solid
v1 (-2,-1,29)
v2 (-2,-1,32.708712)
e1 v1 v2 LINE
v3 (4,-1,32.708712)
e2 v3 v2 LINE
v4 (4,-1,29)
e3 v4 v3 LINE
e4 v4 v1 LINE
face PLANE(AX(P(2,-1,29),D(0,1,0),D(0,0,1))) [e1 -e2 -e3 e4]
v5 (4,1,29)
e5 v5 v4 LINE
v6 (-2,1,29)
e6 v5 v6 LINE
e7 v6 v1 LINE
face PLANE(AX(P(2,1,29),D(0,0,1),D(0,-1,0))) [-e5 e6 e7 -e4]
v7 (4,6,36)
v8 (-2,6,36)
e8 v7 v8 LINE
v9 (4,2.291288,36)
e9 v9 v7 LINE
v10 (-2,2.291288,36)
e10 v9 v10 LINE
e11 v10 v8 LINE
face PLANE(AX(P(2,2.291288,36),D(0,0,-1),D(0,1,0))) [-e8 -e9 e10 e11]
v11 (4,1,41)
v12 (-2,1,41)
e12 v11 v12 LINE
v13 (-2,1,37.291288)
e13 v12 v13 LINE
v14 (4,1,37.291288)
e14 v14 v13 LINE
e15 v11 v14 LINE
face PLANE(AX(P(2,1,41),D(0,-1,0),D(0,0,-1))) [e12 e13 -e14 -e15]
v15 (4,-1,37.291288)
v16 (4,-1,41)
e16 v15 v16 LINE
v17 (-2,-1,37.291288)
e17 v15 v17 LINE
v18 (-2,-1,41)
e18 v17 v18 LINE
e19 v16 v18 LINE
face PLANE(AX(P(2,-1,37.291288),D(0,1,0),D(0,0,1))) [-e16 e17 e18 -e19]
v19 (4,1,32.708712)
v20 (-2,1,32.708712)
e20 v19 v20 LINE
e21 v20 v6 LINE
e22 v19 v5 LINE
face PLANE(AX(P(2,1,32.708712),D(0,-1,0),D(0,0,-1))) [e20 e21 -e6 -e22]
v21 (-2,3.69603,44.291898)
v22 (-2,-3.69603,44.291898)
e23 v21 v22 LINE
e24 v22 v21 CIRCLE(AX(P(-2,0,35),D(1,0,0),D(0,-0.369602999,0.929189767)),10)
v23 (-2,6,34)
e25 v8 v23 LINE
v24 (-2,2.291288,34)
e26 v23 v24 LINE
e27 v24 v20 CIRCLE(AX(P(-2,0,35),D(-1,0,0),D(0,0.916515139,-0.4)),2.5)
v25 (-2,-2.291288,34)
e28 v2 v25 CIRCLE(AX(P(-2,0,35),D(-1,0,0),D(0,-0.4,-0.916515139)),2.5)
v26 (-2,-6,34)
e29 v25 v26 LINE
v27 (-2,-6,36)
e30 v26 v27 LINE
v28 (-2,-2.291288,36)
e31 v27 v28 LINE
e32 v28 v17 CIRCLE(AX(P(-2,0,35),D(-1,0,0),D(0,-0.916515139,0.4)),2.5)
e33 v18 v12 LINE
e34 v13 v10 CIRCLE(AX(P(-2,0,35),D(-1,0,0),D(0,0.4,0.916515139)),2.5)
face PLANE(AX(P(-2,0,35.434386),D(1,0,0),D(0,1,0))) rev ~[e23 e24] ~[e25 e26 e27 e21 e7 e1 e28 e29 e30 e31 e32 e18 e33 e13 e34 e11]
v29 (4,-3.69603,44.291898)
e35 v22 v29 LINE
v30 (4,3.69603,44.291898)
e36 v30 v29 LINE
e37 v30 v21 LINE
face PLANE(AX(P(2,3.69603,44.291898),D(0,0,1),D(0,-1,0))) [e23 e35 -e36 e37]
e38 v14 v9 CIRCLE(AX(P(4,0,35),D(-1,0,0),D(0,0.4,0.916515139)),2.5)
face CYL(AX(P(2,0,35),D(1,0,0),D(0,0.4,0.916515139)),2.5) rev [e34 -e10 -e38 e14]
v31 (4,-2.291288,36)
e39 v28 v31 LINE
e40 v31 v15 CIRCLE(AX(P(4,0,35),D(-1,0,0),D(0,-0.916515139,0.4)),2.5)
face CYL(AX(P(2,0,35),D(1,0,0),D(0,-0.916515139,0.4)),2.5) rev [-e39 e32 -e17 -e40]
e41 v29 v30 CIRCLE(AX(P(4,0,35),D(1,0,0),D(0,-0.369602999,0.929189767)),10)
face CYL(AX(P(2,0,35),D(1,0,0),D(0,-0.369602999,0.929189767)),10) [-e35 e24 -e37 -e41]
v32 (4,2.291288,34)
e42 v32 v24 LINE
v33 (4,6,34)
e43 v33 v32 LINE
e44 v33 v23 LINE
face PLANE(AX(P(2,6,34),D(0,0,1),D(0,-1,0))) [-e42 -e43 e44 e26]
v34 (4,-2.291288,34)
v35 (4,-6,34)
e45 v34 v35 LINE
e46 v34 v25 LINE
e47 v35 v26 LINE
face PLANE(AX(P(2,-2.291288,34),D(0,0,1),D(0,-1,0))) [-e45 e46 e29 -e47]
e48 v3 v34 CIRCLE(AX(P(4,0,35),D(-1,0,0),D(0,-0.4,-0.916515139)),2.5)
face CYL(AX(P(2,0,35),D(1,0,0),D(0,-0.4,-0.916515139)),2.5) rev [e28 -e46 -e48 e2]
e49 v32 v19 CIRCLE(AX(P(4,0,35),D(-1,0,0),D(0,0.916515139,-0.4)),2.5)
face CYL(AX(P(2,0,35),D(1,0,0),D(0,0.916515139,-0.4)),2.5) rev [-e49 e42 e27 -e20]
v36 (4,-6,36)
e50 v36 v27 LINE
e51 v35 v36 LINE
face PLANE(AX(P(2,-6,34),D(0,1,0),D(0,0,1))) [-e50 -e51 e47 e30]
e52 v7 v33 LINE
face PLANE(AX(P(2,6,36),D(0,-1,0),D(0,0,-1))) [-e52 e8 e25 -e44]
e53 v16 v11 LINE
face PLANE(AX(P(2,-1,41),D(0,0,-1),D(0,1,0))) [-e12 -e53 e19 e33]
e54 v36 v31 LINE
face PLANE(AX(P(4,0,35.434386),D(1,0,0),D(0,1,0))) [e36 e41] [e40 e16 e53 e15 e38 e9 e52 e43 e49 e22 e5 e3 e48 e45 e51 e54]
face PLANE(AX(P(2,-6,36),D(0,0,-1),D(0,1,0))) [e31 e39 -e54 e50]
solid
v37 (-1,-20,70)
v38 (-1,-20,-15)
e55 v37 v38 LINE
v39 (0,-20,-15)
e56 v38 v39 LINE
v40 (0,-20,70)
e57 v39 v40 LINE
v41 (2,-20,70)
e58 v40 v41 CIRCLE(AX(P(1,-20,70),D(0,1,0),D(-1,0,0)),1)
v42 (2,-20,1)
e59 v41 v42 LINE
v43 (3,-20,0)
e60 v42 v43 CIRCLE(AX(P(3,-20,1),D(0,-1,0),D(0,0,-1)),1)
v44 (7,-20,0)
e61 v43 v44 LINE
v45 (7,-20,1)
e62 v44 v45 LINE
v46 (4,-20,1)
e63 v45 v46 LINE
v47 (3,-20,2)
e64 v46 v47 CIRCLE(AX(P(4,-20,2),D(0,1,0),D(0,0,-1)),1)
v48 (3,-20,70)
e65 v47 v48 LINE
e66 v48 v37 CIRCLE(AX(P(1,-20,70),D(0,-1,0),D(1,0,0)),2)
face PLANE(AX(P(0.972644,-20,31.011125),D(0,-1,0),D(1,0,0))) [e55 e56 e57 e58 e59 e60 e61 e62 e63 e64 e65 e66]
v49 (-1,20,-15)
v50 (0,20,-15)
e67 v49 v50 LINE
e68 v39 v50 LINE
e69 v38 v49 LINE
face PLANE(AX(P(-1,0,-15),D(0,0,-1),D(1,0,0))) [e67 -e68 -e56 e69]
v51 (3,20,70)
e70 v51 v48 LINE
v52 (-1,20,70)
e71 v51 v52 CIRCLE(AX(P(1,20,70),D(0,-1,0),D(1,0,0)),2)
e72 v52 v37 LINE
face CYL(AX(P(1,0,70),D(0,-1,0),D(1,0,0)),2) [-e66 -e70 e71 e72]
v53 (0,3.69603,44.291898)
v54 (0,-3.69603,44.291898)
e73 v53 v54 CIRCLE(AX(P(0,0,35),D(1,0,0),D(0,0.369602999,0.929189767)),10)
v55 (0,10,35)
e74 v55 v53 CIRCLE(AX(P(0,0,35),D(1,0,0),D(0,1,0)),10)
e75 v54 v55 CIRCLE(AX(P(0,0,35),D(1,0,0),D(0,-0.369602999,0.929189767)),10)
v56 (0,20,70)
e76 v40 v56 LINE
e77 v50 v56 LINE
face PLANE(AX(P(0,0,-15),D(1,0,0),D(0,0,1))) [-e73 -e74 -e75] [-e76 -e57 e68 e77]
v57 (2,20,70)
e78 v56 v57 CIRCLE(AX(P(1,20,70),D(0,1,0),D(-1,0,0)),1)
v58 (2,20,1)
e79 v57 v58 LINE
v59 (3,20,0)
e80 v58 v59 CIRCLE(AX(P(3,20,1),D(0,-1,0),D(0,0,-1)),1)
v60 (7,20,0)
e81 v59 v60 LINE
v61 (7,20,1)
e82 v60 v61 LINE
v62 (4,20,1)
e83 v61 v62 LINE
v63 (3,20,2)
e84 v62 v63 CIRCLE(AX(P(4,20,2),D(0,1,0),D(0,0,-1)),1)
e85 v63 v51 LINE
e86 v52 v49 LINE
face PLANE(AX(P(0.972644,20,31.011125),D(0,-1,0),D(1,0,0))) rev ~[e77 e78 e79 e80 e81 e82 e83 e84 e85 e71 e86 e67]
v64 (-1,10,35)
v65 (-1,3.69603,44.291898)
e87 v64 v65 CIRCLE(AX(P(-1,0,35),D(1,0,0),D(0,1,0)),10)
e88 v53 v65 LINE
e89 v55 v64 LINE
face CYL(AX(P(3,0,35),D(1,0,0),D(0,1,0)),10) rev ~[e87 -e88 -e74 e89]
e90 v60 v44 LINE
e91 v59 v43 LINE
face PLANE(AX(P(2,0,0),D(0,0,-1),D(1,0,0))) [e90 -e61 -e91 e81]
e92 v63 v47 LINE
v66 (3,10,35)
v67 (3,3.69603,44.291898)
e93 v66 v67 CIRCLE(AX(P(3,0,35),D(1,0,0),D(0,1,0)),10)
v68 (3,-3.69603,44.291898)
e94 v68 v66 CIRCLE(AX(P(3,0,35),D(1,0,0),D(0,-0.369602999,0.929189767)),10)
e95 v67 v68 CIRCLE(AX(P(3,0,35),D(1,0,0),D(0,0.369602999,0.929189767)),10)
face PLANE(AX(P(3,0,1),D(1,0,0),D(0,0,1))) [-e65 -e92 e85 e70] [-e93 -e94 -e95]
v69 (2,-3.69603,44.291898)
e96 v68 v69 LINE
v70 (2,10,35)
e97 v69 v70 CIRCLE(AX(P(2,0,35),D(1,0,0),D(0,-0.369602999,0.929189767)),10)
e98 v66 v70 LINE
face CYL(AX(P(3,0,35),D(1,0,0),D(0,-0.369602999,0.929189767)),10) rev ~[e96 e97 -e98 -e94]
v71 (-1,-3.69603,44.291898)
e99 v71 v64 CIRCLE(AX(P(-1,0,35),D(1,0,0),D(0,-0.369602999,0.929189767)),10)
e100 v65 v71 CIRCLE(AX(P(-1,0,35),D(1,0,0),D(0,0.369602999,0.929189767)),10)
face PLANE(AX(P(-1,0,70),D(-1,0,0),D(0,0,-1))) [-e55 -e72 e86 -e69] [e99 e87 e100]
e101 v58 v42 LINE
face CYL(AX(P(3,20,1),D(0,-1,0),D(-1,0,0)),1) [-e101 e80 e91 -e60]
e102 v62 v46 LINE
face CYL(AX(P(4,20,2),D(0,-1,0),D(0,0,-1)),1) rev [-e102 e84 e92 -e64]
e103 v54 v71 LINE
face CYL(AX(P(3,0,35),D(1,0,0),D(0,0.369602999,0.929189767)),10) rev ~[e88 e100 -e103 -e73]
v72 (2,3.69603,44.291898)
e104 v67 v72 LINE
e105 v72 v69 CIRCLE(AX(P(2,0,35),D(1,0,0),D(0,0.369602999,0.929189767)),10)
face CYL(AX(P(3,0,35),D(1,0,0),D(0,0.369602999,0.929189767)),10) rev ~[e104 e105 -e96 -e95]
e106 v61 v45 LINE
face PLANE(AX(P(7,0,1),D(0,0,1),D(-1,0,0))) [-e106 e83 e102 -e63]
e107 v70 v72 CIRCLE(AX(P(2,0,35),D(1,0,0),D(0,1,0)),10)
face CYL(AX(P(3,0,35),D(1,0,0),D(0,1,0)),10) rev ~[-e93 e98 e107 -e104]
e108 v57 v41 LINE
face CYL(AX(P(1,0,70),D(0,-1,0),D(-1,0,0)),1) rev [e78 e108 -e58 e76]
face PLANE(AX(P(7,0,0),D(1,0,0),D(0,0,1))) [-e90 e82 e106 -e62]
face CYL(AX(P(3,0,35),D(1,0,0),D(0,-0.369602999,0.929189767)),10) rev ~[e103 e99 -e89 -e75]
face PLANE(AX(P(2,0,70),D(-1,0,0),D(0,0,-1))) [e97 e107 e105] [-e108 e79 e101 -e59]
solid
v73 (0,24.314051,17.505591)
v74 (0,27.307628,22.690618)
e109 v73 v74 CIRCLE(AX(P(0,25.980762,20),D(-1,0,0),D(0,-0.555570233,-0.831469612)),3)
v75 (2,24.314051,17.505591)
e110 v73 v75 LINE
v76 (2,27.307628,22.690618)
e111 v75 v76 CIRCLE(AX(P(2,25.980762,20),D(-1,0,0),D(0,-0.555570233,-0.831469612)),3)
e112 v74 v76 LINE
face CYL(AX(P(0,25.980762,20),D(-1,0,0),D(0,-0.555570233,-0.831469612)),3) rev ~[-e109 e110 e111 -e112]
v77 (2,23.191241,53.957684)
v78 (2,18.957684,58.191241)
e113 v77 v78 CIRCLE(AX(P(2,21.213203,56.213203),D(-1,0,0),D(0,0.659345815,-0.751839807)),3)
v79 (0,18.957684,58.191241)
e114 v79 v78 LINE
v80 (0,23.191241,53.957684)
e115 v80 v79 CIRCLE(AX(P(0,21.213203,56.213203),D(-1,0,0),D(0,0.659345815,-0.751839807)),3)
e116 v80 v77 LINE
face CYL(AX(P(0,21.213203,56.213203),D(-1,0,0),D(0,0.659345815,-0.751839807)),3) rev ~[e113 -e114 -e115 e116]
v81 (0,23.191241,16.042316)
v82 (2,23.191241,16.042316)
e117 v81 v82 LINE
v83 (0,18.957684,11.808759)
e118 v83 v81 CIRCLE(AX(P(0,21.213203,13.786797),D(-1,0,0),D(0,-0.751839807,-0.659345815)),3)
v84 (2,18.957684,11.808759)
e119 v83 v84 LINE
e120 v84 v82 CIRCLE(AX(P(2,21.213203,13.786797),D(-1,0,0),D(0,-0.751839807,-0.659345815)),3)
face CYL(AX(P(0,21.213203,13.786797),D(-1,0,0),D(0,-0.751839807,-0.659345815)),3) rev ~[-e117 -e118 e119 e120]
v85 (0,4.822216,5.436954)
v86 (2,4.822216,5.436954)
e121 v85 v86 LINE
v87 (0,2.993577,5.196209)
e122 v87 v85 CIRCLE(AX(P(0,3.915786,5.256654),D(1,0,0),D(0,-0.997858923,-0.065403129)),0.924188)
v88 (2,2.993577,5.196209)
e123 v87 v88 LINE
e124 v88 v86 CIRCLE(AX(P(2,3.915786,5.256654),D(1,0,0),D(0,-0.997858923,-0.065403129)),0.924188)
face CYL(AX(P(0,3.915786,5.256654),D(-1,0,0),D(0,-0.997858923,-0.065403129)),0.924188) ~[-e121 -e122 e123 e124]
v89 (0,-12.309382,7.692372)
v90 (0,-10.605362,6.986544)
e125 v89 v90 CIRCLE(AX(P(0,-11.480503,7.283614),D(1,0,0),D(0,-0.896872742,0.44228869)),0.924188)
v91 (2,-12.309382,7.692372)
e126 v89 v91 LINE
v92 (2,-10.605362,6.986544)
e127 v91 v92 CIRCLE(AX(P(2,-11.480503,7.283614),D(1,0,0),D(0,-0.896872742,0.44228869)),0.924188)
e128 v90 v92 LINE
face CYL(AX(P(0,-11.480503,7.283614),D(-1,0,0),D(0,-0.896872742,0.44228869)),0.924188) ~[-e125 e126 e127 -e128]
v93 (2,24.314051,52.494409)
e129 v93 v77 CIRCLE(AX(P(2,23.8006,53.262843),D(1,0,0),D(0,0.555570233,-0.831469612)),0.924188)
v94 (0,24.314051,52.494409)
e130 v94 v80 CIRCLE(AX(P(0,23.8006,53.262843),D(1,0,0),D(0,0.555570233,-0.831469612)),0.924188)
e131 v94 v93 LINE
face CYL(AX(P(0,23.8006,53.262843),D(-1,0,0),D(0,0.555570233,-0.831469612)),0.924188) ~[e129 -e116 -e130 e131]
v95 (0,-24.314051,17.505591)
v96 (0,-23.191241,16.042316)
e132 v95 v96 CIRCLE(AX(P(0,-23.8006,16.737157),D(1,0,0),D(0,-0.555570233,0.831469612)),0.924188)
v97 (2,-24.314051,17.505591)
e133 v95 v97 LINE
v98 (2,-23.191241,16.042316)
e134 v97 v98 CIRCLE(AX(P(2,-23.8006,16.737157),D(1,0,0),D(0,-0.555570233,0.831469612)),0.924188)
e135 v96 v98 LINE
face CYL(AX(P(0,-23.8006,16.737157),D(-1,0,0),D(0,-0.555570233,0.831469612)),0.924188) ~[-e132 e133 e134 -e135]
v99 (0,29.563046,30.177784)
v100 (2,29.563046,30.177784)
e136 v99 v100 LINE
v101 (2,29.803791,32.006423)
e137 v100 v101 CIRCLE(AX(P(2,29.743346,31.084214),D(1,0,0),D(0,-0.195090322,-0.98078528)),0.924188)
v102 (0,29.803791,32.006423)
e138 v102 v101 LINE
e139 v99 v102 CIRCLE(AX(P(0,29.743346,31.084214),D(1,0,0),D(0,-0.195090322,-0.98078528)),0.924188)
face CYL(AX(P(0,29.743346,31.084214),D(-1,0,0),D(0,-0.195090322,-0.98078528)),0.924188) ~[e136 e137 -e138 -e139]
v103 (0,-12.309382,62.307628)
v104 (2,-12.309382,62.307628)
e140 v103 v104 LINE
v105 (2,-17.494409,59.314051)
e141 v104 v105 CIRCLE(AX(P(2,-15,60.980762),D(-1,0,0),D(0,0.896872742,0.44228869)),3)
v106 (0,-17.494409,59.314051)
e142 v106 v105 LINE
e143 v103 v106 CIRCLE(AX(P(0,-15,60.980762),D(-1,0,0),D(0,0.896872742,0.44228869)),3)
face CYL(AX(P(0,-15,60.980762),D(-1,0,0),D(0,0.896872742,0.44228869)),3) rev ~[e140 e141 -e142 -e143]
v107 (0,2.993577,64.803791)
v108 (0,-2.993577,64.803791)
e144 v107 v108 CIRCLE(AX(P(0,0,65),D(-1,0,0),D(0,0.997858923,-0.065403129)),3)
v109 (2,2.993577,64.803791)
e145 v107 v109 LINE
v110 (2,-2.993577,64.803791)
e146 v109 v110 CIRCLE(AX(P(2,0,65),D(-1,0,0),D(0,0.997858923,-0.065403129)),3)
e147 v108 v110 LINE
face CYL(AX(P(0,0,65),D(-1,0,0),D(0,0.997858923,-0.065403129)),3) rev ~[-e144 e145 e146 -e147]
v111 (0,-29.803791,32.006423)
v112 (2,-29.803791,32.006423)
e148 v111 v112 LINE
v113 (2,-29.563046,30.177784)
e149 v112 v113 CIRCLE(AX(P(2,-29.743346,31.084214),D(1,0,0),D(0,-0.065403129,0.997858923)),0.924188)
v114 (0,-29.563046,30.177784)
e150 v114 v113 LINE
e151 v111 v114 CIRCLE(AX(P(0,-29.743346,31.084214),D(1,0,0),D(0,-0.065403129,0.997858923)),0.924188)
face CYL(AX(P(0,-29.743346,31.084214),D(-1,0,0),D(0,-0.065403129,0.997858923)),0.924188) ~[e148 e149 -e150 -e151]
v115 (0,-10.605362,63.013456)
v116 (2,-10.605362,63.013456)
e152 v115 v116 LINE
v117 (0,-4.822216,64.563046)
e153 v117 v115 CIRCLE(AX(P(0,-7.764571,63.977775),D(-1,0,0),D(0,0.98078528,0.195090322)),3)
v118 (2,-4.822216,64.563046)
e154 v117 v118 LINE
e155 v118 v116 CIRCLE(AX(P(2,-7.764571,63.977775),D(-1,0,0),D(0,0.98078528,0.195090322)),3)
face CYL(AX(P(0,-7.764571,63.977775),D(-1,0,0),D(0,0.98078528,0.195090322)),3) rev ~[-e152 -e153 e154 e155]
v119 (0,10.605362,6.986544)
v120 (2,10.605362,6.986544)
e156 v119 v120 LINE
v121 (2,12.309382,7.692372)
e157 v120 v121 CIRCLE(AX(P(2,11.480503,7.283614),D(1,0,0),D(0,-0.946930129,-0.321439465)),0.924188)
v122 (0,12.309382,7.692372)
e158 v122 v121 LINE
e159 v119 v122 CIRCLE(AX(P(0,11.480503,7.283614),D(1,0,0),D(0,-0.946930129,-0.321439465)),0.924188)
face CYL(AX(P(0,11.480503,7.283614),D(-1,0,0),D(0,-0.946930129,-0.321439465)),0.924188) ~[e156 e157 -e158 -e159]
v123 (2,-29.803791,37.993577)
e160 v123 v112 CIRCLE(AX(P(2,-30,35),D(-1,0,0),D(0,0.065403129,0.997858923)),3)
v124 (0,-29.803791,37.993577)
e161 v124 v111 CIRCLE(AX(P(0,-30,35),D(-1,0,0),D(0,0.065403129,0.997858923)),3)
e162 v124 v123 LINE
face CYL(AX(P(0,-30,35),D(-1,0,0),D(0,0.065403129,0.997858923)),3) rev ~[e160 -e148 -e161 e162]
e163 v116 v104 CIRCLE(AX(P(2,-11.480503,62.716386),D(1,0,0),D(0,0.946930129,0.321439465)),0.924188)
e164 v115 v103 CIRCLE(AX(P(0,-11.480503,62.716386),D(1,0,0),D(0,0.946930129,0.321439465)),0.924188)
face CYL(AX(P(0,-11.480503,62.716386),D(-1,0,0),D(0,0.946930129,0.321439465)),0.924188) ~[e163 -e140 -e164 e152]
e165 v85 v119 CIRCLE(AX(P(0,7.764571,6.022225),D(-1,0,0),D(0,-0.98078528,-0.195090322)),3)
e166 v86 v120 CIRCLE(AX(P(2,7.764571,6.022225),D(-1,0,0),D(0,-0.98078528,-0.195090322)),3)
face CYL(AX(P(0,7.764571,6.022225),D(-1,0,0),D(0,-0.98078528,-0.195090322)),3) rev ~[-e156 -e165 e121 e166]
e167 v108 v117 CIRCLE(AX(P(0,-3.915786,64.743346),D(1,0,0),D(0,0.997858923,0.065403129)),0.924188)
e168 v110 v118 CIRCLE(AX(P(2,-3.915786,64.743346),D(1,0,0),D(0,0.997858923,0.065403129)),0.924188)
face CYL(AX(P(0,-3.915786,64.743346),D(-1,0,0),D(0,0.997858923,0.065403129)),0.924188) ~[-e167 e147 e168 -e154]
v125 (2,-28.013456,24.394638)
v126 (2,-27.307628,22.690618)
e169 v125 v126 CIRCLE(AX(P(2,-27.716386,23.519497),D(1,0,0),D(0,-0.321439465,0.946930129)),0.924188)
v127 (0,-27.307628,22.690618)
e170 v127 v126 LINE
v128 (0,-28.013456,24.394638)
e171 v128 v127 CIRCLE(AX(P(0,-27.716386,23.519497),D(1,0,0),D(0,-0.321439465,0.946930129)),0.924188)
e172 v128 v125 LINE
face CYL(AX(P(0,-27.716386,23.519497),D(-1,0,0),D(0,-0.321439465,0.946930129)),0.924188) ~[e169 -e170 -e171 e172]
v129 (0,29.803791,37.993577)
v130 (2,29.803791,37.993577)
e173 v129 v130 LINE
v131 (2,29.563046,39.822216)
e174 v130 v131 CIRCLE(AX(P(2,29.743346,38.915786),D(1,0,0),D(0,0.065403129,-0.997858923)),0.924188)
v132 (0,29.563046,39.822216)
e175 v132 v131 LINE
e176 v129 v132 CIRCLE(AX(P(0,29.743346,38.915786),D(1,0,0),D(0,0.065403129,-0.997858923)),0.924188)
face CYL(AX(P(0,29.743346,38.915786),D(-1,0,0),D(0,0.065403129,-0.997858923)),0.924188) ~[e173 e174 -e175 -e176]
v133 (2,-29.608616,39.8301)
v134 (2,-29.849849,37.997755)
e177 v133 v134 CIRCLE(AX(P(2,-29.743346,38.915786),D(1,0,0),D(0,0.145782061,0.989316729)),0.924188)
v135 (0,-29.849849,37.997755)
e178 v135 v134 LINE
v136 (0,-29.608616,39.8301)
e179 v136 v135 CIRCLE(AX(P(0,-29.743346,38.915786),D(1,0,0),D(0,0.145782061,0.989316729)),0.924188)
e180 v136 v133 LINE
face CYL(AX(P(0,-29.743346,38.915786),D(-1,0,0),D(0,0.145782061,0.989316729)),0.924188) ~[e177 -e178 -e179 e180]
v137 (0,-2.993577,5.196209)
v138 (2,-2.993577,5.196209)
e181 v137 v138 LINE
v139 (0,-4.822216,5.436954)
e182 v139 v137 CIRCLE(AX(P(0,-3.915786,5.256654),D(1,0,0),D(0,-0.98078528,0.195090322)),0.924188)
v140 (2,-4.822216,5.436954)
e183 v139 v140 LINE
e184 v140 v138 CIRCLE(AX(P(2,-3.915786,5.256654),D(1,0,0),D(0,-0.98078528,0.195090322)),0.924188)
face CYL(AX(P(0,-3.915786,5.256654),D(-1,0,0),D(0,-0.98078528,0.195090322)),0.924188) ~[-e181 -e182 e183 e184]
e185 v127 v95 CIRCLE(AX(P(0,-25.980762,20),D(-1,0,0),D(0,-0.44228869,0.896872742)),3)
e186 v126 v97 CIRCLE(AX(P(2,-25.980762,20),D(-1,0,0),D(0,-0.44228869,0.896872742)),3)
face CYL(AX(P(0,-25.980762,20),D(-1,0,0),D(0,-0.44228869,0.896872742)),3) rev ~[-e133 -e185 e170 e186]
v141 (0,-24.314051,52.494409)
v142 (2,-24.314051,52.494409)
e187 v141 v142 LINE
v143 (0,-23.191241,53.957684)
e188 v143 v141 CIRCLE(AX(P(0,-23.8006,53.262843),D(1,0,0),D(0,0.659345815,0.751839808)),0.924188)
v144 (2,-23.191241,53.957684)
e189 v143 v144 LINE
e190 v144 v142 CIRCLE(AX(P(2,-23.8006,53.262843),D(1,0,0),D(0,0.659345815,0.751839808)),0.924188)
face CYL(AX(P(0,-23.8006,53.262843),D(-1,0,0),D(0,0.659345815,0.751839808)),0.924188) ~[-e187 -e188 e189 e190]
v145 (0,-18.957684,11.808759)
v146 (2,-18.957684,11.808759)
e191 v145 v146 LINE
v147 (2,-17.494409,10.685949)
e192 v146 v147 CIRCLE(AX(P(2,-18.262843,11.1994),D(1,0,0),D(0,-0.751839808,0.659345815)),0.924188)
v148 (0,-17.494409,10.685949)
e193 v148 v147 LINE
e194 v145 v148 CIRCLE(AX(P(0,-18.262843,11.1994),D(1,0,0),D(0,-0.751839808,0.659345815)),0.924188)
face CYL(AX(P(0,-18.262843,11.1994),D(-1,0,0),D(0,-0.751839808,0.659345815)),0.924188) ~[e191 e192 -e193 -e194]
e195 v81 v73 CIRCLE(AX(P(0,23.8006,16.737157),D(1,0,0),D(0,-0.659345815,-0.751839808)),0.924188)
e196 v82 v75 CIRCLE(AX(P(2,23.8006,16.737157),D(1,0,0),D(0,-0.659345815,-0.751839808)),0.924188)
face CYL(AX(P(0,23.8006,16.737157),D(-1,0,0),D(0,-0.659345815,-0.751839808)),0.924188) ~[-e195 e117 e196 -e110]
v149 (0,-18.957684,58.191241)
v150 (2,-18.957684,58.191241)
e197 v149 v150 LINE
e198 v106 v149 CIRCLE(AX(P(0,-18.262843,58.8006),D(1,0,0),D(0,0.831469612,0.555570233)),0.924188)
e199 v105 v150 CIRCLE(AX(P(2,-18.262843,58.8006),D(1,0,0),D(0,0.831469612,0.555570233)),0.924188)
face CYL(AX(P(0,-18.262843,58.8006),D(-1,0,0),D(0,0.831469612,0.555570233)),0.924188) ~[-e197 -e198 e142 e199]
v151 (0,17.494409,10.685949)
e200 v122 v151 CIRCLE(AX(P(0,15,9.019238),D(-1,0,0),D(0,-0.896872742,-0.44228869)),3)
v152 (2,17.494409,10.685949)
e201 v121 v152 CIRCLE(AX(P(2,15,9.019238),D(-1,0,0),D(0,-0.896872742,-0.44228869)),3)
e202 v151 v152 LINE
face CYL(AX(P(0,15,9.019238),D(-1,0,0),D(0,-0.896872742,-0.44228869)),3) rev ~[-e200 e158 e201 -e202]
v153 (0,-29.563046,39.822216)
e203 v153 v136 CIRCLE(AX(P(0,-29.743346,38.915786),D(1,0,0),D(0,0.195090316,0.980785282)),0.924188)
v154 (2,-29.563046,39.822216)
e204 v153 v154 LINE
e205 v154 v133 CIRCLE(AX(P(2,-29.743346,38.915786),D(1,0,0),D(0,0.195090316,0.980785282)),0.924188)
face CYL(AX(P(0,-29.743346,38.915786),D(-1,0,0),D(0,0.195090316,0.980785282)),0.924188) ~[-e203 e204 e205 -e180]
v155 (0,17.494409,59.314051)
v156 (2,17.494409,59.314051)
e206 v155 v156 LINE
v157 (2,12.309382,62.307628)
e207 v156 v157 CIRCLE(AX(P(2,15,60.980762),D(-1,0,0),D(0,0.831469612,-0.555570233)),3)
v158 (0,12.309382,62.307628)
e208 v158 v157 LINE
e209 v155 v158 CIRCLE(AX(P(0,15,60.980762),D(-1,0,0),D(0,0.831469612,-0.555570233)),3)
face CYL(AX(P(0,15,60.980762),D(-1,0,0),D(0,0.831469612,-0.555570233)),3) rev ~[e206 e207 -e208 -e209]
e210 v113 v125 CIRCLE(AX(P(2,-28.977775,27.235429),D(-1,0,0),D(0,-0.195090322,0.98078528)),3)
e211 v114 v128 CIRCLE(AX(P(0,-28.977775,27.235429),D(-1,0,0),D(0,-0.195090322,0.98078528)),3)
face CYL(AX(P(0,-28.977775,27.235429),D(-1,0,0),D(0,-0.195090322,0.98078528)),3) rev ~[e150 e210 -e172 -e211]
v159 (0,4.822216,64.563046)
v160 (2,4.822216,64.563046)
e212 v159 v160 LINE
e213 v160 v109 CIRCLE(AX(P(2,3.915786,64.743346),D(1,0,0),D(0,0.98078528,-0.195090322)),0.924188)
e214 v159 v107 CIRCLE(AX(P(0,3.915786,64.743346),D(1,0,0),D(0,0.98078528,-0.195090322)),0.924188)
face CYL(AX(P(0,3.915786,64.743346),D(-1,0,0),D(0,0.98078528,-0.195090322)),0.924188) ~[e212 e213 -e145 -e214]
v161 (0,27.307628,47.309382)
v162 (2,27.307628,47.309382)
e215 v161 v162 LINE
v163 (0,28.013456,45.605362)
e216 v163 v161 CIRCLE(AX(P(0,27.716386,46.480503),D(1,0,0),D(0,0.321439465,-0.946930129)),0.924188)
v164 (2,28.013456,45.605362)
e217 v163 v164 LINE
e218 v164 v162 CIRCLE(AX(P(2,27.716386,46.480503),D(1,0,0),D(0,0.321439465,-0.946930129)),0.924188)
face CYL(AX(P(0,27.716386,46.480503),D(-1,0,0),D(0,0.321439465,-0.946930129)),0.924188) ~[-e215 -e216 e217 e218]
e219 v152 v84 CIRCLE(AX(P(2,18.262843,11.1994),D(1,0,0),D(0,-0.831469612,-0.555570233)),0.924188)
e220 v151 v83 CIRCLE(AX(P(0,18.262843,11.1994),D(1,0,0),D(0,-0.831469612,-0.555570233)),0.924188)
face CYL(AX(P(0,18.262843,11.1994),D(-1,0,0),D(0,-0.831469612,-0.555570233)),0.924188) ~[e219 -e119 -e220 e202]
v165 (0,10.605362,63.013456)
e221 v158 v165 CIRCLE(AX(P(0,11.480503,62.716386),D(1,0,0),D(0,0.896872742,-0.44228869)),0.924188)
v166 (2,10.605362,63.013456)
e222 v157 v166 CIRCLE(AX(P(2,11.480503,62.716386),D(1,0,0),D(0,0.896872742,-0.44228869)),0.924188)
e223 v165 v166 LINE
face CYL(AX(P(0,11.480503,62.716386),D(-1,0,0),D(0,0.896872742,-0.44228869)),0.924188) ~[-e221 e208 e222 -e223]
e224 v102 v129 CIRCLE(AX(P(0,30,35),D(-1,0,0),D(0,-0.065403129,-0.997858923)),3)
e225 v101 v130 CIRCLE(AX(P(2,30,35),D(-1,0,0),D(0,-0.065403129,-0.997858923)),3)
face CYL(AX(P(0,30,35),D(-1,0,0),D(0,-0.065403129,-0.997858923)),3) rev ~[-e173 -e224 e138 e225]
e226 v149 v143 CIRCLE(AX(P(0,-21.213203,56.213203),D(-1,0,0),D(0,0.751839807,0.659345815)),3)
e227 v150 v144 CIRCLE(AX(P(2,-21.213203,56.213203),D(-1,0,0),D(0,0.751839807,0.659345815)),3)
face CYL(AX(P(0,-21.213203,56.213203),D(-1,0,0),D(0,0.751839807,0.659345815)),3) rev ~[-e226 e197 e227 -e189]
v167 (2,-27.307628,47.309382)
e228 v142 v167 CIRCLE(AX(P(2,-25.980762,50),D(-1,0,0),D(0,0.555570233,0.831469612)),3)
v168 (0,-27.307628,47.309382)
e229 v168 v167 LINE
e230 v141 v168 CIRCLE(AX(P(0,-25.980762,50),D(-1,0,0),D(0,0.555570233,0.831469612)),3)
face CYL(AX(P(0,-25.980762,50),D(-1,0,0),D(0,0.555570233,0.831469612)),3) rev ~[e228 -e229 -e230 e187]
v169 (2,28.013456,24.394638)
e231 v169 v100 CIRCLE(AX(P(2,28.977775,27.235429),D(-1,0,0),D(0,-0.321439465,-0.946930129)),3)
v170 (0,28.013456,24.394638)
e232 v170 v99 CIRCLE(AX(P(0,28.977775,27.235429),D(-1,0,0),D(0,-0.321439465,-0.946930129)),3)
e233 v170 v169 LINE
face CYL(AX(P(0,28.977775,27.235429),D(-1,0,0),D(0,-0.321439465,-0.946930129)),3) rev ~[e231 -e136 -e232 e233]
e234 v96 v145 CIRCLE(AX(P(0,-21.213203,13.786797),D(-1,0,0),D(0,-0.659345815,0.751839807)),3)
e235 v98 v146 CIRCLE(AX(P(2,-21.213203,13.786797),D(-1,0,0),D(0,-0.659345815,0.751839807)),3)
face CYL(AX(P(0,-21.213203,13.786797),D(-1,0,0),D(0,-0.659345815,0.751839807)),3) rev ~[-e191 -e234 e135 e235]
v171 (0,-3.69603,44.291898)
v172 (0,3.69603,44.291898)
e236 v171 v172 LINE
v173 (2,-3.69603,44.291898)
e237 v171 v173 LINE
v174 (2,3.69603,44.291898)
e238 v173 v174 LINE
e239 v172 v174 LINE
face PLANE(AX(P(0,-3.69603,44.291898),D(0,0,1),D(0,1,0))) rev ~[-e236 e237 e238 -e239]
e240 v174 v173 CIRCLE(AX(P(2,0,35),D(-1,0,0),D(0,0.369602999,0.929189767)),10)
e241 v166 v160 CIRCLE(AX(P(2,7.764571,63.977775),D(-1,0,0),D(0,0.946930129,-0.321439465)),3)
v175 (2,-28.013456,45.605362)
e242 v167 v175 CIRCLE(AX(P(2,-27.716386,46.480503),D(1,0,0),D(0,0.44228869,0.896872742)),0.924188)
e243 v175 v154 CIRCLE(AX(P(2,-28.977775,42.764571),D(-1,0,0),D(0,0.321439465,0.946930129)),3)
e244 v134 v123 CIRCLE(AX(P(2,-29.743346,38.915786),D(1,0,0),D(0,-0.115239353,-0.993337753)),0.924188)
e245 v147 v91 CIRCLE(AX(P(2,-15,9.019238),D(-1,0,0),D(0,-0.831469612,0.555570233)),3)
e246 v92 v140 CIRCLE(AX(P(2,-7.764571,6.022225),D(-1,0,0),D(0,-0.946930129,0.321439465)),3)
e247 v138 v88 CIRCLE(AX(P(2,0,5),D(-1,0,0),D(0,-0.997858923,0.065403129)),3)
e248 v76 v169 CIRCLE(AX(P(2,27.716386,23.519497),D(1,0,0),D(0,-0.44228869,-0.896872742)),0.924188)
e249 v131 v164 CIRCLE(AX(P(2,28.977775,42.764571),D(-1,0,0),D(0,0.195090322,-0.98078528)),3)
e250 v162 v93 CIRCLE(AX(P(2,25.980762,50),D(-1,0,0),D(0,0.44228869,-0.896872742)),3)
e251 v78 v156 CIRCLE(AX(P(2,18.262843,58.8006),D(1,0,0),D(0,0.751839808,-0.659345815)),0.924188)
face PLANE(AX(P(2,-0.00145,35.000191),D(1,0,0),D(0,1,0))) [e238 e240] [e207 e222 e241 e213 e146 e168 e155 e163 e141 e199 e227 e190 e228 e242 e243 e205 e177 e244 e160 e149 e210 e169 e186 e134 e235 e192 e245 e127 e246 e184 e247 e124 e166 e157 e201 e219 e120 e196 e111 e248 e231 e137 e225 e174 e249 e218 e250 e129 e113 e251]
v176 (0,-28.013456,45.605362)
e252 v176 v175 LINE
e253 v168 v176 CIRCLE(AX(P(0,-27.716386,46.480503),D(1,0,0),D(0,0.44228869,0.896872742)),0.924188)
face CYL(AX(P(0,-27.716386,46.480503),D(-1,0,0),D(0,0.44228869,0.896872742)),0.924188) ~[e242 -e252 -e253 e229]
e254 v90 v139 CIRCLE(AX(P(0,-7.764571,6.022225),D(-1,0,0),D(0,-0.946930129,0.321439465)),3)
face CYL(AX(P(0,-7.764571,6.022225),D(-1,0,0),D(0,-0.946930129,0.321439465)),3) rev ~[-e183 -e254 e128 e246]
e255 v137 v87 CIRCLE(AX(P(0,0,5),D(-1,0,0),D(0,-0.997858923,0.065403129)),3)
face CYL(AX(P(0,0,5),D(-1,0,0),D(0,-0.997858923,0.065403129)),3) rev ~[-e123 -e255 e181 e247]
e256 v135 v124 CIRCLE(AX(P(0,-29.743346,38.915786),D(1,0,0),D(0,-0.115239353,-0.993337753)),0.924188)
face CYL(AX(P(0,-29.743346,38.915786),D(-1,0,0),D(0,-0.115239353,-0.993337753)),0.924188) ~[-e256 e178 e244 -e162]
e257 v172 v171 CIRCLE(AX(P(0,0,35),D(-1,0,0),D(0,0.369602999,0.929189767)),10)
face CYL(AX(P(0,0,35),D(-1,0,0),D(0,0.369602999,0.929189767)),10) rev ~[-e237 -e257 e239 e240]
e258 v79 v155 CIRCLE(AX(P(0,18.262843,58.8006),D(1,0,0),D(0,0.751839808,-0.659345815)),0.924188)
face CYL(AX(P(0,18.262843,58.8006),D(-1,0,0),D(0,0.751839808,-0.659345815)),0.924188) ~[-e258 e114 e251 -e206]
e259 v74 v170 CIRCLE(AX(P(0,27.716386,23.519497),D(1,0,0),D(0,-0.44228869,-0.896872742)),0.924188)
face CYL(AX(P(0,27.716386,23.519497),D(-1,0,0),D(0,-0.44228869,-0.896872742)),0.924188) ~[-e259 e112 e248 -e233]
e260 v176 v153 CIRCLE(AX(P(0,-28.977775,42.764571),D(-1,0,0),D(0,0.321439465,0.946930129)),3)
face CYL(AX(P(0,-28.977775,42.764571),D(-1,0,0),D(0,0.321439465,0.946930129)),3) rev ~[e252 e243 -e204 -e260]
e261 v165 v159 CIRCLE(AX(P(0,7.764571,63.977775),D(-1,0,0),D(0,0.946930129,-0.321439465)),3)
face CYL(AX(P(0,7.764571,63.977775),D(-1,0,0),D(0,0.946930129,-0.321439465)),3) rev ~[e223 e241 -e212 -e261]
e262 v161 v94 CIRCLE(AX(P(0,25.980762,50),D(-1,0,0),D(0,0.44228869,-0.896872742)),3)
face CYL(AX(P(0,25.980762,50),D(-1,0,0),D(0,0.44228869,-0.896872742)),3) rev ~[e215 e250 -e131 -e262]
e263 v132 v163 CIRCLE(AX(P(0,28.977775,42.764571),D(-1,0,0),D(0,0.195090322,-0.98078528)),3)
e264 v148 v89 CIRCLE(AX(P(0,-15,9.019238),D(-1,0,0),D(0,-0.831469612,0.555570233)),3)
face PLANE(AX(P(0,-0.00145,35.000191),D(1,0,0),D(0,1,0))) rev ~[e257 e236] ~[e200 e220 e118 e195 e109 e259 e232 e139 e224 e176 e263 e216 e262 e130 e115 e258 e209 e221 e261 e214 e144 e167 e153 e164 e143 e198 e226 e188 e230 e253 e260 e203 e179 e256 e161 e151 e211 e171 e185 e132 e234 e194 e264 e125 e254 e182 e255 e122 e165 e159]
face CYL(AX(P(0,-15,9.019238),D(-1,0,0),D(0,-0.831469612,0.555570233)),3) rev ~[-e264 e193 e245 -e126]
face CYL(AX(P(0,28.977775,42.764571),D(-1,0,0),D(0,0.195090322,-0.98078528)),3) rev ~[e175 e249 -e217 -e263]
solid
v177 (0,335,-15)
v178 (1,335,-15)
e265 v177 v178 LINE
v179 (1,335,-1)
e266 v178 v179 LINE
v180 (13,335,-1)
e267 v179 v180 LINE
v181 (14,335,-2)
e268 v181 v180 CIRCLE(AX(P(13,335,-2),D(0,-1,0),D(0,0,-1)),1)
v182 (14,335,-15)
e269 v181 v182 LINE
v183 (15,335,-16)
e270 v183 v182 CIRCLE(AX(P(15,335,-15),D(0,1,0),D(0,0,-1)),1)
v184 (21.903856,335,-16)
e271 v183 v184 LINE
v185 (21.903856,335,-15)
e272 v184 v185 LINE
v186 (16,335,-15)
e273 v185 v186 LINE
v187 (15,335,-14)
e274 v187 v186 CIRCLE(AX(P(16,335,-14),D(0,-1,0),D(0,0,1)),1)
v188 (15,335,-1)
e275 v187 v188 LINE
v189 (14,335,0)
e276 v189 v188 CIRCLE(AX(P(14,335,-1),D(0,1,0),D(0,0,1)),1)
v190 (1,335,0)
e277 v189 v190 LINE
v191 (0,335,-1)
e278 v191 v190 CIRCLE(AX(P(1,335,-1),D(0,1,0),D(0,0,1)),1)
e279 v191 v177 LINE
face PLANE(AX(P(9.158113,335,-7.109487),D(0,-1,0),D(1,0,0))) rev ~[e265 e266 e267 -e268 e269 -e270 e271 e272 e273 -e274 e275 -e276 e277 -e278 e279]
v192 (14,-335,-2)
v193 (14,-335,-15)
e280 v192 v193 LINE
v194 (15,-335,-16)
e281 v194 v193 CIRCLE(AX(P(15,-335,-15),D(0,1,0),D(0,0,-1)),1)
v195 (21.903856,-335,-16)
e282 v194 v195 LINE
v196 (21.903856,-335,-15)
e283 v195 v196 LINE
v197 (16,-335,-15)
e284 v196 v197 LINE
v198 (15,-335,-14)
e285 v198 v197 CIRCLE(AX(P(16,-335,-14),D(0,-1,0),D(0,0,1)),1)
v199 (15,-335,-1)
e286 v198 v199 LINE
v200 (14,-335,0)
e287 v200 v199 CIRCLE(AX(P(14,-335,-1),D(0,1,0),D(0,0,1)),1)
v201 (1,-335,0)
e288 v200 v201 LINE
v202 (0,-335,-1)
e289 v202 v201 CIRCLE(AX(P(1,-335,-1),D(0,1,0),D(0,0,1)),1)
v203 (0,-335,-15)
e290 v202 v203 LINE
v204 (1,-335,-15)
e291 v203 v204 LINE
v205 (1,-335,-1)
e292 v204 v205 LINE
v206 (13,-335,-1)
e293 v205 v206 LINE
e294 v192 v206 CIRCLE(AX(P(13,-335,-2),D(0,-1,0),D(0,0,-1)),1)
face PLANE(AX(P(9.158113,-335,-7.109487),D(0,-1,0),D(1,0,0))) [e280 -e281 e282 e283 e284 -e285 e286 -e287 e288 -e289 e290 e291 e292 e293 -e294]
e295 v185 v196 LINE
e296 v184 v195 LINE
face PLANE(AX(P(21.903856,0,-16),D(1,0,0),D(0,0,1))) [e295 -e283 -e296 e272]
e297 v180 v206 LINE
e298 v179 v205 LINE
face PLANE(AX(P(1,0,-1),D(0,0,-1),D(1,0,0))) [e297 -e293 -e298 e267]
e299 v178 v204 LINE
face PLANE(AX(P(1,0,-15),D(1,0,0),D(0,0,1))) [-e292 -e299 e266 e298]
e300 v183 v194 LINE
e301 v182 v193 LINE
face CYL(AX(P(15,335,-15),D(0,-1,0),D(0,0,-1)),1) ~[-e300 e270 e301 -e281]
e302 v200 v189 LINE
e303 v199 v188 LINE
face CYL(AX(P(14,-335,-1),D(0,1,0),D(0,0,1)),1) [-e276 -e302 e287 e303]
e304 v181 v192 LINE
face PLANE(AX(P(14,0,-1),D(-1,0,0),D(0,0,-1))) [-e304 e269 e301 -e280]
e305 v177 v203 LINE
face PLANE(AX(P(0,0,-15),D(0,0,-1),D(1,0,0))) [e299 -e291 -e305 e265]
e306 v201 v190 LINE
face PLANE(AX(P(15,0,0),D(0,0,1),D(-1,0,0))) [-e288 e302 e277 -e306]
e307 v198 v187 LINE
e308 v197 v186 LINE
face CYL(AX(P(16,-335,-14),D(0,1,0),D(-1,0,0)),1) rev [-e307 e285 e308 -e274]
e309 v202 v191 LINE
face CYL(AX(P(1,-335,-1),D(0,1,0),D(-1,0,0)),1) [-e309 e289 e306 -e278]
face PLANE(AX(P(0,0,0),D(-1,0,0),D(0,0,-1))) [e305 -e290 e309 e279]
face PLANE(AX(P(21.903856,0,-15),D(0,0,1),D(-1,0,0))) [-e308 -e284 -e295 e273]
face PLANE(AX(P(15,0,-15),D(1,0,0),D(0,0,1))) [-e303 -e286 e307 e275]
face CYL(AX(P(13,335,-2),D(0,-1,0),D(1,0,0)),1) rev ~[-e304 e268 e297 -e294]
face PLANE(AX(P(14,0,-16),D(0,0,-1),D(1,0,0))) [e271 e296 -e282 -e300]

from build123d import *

# Parameters (mm, degrees)
F7_DEPTH      = 335
F1_R          = 1
F3_DEPTH      = 2
F9_DEPTH      = 2
F9_DEPTH_BACK = 4
F10_DEPTH     = 20
F11_DEPTH     = 25
F6_R          = 1


with BuildPart() as f7:
    # F0 (on Front) → F7 (new body, symmetric)
    with BuildSketch(Plane.XZ):
        Polygon((1, 0), (0, 0), (0, -1), (0, -15), (1, -15), (1, -1), (14, -1), (14, -15), (14, -16), (15, -16), (21.9038559089, -16), (21.9038559089, -15), (15, -15), (15, -1), (15, 0), (14, 0), align=None)
    extrude(amount=F7_DEPTH, both=True)

    # F1
    f1_edges = [f7.edges().sort_by_distance(p)[0] for p in [
        (15, 0, 0),
        (0, 0, 0),
        (15, 0, -15),
        (14, 0, -16),
        (14, 0, -1),
    ]]
    fillet(f1_edges, radius=F1_R)


with BuildPart() as f3:
    # F2 (on Right) → F3 (new body)
    with BuildSketch(Plane.YZ):
        with BuildLine():
            ThreePointArc((-29.8037906123, 37.9935767697), (-27, 35), (-29.8037906123, 32.0064232303))
            ThreePointArc((-29.8037906123, 32.0064232303), (-30.6596270407, 30.963583525), (-29.5630457547, 30.1777844881))
            ThreePointArc((-29.5630457547, 30.1777844881), (-26.0799973098, 28.0118857822), (-28.0134563928, 24.3946382584))
            ThreePointArc((-28.0134563928, 24.3946382584), (-28.5702241253, 23.1658256873), (-27.3076281842, 22.6906182246))
            ThreePointArc((-27.3076281842, 22.6906182246), (-23.3826859022, 21.5), (-24.3140514145, 17.5055911631))
            ThreePointArc((-24.3140514145, 17.5055911631), (-24.5338076503, 16.1745472721), (-23.1912408809, 16.0423159868))
            ThreePointArc((-23.1912408809, 16.0423159868), (-19.091883092, 15.908116908), (-18.9576840132, 11.8087591191))
            ThreePointArc((-18.9576840132, 11.8087591191), (-18.8254527279, 10.4661923497), (-17.4944088369, 10.6859485855))
            ThreePointArc((-17.4944088369, 10.6859485855), (-13.5, 11.6173140978), (-12.3093817754, 7.6923718158))
            ThreePointArc((-12.3093817754, 7.6923718158), (-11.8341743127, 6.4297758747), (-10.6053617416, 6.9865436072))
            ThreePointArc((-10.6053617416, 6.9865436072), (-6.9881142178, 8.9200026902), (-4.8222155119, 5.4369542453))
            ThreePointArc((-4.8222155119, 5.4369542453), (-4.036416475, 4.3403729593), (-2.9935767697, 5.1962093877))
            ThreePointArc((-2.9935767697, 5.1962093877), (0, 8), (2.9935767697, 5.1962093877))
            ThreePointArc((2.9935767697, 5.1962093877), (4.036416475, 4.3403729593), (4.8222155119, 5.4369542453))
            ThreePointArc((4.8222155119, 5.4369542453), (6.9881142178, 8.9200026902), (10.6053617416, 6.9865436072))
            ThreePointArc((10.6053617416, 6.9865436072), (11.8341743127, 6.4297758747), (12.3093817754, 7.6923718158))
            ThreePointArc((12.3093817754, 7.6923718158), (13.5, 11.6173140978), (17.4944088369, 10.6859485855))
            ThreePointArc((17.4944088369, 10.6859485855), (18.8254527279, 10.4661923497), (18.9576840132, 11.8087591191))
            ThreePointArc((18.9576840132, 11.8087591191), (19.091883092, 15.908116908), (23.1912408809, 16.0423159868))
            ThreePointArc((23.1912408809, 16.0423159868), (24.5338076503, 16.1745472721), (24.3140514145, 17.5055911631))
            ThreePointArc((24.3140514145, 17.5055911631), (23.3826859022, 21.5), (27.3076281842, 22.6906182246))
            ThreePointArc((27.3076281842, 22.6906182246), (28.5702241253, 23.1658256873), (28.0134563928, 24.3946382584))
            ThreePointArc((28.0134563928, 24.3946382584), (26.0799973098, 28.0118857822), (29.5630457547, 30.1777844881))
            ThreePointArc((29.5630457547, 30.1777844881), (30.6596270407, 30.963583525), (29.8037906123, 32.0064232303))
            ThreePointArc((29.8037906123, 32.0064232303), (27, 35), (29.8037906123, 37.9935767697))
            ThreePointArc((29.8037906123, 37.9935767697), (30.6596270407, 39.036416475), (29.5630457547, 39.8222155119))
            ThreePointArc((29.5630457547, 39.8222155119), (26.0799973098, 41.9881142178), (28.0134563928, 45.6053617416))
            ThreePointArc((28.0134563928, 45.6053617416), (28.5702241253, 46.8341743127), (27.3076281842, 47.3093817754))
            ThreePointArc((27.3076281842, 47.3093817754), (23.3826859022, 48.5), (24.3140514145, 52.4944088369))
            ThreePointArc((24.3140514145, 52.4944088369), (24.5338076503, 53.8254527279), (23.1912408809, 53.9576840132))
            ThreePointArc((23.1912408809, 53.9576840132), (19.091883092, 54.091883092), (18.9576840132, 58.1912408809))
            ThreePointArc((18.9576840132, 58.1912408809), (18.8254527279, 59.5338076503), (17.4944088369, 59.3140514145))
            ThreePointArc((17.4944088369, 59.3140514145), (13.5, 58.3826859022), (12.3093817754, 62.3076281842))
            ThreePointArc((12.3093817754, 62.3076281842), (11.8341743127, 63.5702241253), (10.6053617416, 63.0134563928))
            ThreePointArc((10.6053617416, 63.0134563928), (6.9881142178, 61.0799973098), (4.8222155119, 64.5630457547))
            ThreePointArc((4.8222155119, 64.5630457547), (4.036416475, 65.6596270407), (2.9935767697, 64.8037906123))
            ThreePointArc((2.9935767697, 64.8037906123), (0, 62), (-2.9935767697, 64.8037906123))
            ThreePointArc((-2.9935767697, 64.8037906123), (-4.036416475, 65.6596270407), (-4.8222155119, 64.5630457547))
            ThreePointArc((-4.8222155119, 64.5630457547), (-6.9881142178, 61.0799973098), (-10.6053617416, 63.0134563928))
            ThreePointArc((-10.6053617416, 63.0134563928), (-11.8341743127, 63.5702241253), (-12.3093817754, 62.3076281842))
            ThreePointArc((-12.3093817754, 62.3076281842), (-13.5, 58.3826859022), (-17.4944088369, 59.3140514145))
            ThreePointArc((-17.4944088369, 59.3140514145), (-18.8254527279, 59.5338076503), (-18.9576840132, 58.1912408809))
            ThreePointArc((-18.9576840132, 58.1912408809), (-19.091883092, 54.091883092), (-23.1912408809, 53.9576840132))
            ThreePointArc((-23.1912408809, 53.9576840132), (-24.5338076503, 53.8254527279), (-24.3140514145, 52.4944088369))
            ThreePointArc((-24.3140514145, 52.4944088369), (-23.3826859022, 48.5), (-27.3076281842, 47.3093817754))
            ThreePointArc((-27.3076281842, 47.3093817754), (-28.5702241253, 46.8341743127), (-28.0134563928, 45.6053617416))
            ThreePointArc((-28.0134563928, 45.6053617416), (-26.0799973098, 41.9881142178), (-29.5630457547, 39.8222155119))
            ThreePointArc((-29.5630457547, 39.8222155119), (-29.5857814733, 39.8264429327), (-29.6086158461, 39.8301001724))
            ThreePointArc((-29.6086158461, 39.8301001724), (-30.6596270407, 39.036416475), (-29.8498486408, 37.99775518))
            ThreePointArc((-29.8498486408, 37.99775518), (-29.8268457671, 37.9953778317), (-29.8037906123, 37.9935767697))
        make_face()
        with BuildLine():
            ThreePointArc((3.6960299928, 44.2918976691), (0, 25), (-3.6960299928, 44.2918976691))
            Line((-3.6960299928, 44.2918976691), (3.6960299928, 44.2918976691))
        make_face(mode=Mode.SUBTRACT)
    extrude(amount=F3_DEPTH)


with BuildPart() as f9:
    # F8 (on face) → F9 (new body, two sides)
    with BuildSketch(Plane.YZ.offset(2)) as f9_sk:
        with BuildLine():
            Line((3.6960299928, 44.2918976691), (-3.6960299928, 44.2918976691))
            ThreePointArc((-3.6960299928, 44.2918976691), (0, 25), (3.6960299928, 44.2918976691))
        make_face()
        with BuildLine():
            ThreePointArc((-2.2912878475, 36), (-1.767766953, 36.767766953), (-1, 37.2912878475))
            Line((-1, 37.2912878475), (-1, 41))
            Line((-1, 41), (1, 41))
            Line((1, 41), (1, 37.2912878475))
            ThreePointArc((1, 37.2912878475), (1.767766953, 36.767766953), (2.2912878475, 36))
            Line((2.2912878475, 36), (6, 36))
            Line((6, 36), (6, 34))
            Line((6, 34), (2.2912878475, 34))
            ThreePointArc((2.2912878475, 34), (1.767766953, 33.232233047), (1, 32.7087121525))
            Line((1, 32.7087121525), (1, 29))
            Line((1, 29), (-1, 29))
            Line((-1, 29), (-1, 32.7087121525))
            ThreePointArc((-1, 32.7087121525), (-1.767766953, 33.232233047), (-2.2912878475, 34))
            Line((-2.2912878475, 34), (-6, 34))
            Line((-6, 34), (-6, 36))
            Line((-6, 36), (-2.2912878475, 36))
        make_face(mode=Mode.SUBTRACT)
    extrude(amount=F9_DEPTH)
    extrude(f9_sk.sketch, amount=-F9_DEPTH_BACK)


with BuildPart() as f10:
    # F4 (on Front) → F10 (new body, symmetric)
    with BuildSketch(Plane.XZ):
        with BuildLine():
            Line((0, 25), (0, 44.2918976691))
            Line((0, 44.2918976691), (0, 70))
            ThreePointArc((0, 70), (1, 71), (2, 70))
            Line((2, 70), (2, 44.2918976691))
            Line((2, 44.2918976691), (2, 25))
            Line((2, 25), (2, 1))
            Line((2, 1), (2, 0))
            Line((2, 0), (3, 0))
            Line((3, 0), (7, 0))
            Line((7, 0), (7, 1))
            Line((7, 1), (3, 1))
            Line((3, 1), (3, 70))
            ThreePointArc((3, 70), (1, 72), (-1, 70))
            Line((-1, 70), (-1, -15))
            Line((-1, -15), (0, -15))
            Line((0, -15), (0, 0))
            Line((0, 0), (0, 25))
        make_face()
    extrude(amount=F10_DEPTH, both=True)

    # F5 (on face) → F11 (cut)
    with BuildSketch(Plane.YZ.offset(3)):
        with BuildLine():
            ThreePointArc((3.6960299928, 44.2918976691), (0, 45), (-3.6960299928, 44.2918976691))
            ThreePointArc((-3.6960299928, 44.2918976691), (-5.6142541834, 26.7247265928), (10, 35))
            ThreePointArc((10, 35), (8.2752734072, 40.6142541834), (3.6960299928, 44.2918976691))
        make_face()
    extrude(amount=-F11_DEPTH, mode=Mode.SUBTRACT)

    # F6
    f6_edges = [f10.edges().sort_by_distance(p)[0] for p in [
        (3, 0, 1),
        (2, 0, 0),
    ]]
    fillet(f6_edges, radius=F6_R)


solid = Compound([f7.part, f3.part, f9.part, f10.part])
